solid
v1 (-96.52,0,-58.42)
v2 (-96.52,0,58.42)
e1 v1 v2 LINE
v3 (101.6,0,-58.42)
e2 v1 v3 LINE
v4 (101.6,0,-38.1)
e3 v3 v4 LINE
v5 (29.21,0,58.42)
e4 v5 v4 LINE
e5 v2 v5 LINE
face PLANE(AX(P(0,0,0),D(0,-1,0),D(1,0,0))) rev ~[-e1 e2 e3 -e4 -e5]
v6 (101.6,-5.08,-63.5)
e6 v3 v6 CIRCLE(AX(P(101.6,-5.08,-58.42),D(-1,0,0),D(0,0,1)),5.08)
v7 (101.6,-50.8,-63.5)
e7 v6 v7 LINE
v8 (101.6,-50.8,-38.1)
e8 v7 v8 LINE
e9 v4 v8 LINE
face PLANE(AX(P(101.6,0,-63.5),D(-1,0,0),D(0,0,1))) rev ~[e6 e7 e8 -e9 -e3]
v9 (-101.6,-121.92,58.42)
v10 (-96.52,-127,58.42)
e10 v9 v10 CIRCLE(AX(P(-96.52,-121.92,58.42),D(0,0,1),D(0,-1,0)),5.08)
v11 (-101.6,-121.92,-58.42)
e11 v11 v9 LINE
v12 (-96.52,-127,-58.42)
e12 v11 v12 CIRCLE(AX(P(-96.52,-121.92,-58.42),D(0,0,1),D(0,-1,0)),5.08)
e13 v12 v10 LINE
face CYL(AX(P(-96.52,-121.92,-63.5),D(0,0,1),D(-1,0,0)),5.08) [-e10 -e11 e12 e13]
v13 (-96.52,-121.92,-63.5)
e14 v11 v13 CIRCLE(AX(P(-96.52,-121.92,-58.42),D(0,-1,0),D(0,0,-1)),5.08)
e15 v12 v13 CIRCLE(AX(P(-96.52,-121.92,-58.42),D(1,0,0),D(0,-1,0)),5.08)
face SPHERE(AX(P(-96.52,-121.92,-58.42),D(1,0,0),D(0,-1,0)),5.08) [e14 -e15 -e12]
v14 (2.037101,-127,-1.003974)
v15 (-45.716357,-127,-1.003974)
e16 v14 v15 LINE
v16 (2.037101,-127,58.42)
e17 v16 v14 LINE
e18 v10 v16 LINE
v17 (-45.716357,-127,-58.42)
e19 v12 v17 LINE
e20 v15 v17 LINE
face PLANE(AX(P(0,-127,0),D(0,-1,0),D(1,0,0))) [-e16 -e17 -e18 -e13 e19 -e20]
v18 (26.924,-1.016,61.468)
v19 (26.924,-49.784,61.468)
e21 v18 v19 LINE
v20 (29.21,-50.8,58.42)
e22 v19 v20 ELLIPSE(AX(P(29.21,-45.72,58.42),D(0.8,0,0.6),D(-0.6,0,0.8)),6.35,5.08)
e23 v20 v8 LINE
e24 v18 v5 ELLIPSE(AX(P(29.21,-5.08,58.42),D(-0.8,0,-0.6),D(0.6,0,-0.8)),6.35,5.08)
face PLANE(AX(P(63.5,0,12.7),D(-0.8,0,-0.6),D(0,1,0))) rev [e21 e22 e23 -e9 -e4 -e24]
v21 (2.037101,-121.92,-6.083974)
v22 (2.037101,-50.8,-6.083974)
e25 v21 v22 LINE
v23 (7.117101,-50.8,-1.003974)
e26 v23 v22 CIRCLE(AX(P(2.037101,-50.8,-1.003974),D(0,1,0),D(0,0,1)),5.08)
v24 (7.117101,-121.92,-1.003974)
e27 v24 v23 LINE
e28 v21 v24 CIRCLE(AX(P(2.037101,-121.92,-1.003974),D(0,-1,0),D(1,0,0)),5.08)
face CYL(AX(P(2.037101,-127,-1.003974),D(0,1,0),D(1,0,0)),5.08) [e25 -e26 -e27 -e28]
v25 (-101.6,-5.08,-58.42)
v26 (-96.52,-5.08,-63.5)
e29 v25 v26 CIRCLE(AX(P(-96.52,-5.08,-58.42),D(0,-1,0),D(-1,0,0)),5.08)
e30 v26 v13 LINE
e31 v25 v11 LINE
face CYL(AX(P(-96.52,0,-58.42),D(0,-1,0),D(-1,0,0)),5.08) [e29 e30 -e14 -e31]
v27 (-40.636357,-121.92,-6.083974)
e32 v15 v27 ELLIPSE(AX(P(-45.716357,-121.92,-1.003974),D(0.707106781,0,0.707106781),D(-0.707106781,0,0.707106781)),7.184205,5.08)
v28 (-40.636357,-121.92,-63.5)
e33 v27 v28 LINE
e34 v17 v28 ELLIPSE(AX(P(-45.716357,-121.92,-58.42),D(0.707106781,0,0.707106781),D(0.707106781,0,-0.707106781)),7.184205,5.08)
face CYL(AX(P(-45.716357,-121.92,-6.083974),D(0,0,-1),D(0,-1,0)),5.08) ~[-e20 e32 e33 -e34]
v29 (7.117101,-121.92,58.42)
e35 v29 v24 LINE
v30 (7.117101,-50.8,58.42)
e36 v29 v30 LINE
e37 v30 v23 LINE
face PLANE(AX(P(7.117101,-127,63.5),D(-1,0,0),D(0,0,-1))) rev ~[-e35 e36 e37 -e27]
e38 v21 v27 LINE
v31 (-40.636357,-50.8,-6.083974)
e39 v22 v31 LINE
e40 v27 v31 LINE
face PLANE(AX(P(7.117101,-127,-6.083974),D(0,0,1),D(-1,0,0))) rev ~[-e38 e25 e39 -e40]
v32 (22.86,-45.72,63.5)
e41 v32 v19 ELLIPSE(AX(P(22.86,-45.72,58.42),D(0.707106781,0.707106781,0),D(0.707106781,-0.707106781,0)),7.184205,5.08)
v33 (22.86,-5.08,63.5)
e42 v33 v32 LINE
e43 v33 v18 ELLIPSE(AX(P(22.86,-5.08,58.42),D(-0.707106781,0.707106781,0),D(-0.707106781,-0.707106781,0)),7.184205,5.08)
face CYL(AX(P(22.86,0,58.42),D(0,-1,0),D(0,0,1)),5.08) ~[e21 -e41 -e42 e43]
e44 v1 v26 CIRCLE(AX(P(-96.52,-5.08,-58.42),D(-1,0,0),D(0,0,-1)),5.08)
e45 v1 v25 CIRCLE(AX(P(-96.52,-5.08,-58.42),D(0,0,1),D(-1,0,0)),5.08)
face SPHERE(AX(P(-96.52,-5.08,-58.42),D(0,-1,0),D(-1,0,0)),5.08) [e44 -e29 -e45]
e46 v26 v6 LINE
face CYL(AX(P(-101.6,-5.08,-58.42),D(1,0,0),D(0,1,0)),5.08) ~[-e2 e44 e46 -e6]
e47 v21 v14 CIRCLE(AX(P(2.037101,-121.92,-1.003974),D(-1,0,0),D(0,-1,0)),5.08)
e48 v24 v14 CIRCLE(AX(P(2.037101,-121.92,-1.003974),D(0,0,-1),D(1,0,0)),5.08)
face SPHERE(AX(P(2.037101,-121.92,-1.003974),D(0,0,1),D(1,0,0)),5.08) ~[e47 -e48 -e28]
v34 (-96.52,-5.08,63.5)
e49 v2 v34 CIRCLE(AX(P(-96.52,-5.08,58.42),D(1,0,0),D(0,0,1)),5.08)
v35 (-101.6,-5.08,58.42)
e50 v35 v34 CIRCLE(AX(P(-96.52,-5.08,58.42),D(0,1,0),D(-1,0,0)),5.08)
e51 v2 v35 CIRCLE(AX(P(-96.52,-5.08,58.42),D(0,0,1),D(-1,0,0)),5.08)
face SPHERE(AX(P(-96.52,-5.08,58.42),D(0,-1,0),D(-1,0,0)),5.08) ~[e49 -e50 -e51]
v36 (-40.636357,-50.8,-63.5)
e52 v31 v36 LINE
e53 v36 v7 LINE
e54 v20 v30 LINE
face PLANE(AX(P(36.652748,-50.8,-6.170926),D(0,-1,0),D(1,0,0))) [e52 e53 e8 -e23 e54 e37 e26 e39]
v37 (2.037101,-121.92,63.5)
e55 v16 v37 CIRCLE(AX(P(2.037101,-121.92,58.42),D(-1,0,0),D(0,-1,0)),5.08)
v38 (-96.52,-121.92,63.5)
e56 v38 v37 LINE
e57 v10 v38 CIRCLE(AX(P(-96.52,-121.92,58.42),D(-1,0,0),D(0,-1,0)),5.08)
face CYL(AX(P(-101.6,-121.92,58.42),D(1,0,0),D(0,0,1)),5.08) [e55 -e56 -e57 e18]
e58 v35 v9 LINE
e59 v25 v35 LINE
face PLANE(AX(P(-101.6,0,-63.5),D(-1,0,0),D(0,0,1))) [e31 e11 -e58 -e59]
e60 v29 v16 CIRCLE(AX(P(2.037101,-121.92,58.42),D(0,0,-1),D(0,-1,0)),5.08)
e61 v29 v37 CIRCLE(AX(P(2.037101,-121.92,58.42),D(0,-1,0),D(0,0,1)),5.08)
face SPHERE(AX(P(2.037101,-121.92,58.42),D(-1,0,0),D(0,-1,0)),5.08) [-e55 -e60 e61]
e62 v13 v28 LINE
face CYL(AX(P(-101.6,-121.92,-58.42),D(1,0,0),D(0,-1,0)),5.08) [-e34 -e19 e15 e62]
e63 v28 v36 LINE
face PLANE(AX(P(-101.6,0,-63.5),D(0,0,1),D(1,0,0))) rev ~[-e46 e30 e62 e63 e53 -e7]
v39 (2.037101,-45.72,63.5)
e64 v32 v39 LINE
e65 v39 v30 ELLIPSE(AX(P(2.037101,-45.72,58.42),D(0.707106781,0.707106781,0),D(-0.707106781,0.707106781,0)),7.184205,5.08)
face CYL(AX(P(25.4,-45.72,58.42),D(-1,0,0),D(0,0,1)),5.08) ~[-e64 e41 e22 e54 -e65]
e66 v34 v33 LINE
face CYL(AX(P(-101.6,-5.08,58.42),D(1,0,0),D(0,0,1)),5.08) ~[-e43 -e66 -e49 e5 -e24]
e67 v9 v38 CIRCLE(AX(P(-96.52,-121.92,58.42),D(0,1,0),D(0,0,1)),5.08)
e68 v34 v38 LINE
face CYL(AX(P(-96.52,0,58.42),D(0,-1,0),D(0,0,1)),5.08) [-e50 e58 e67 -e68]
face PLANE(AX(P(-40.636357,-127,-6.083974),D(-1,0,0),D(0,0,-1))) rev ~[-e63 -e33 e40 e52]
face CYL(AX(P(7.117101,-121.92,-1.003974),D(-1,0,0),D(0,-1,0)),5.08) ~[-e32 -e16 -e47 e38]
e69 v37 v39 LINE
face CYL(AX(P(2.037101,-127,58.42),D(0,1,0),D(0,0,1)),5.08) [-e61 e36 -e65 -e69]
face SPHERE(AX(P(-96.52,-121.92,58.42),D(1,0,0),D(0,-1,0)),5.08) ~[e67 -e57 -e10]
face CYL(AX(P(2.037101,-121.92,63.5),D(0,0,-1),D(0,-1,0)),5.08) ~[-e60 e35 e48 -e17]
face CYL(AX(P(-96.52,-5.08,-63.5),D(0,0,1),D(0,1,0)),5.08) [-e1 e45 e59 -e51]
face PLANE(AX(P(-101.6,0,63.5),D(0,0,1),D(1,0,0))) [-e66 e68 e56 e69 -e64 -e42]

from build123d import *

# Parameters (mm, degrees)
F0_W     = 203.2
F0_H     = 127
F1_DEPTH = 127
F3_DEPTH = 76.2
F4_SIZE2 = 101.6
F4_SIZE  = 76.2
F5_R     = 5.08


# Not quite as in the source:
# - the program builds the solid bodies; features that only make, move or delete a surface that nothing else refers to are left out


with BuildPart() as f1:
    # F0 (on Front) → F1 (new body)
    with BuildSketch(Plane.XZ):
        Rectangle(F0_W, F0_H)
    extrude(amount=F1_DEPTH)

    # F2 (on face) → F3 (cut)
    with BuildSketch(Plane.XZ.offset(127)):
        Polygon((-40.63635692, -6.0839741491), (-40.63635692, -63.5), (101.6, -63.5), (101.6, 63.5), (7.1171009913, 63.5), (7.1171009913, -6.0839741491), align=None)
    extrude(amount=-F3_DEPTH, mode=Mode.SUBTRACT)

    # F4
    f4_edges = [f1.edges().sort_by_distance(p)[0] for p in [
        (101.6, -25.4, 63.5),
    ]]
    f4_side = f1.faces().sort_by_distance((-21.033148, -53.671887, 63.5))[0]
    chamfer(f4_edges, length=F4_SIZE, length2=F4_SIZE2, reference=f4_side)

    # F5
    f5_edges = [f1.edges().sort_by_distance(p)[0] for p in [
        (-47.24145, -127, 63.5),
        (7.117101, -127, 28.708013),
        (7.117101, -88.9, -6.083974),
        (7.117101, -88.9, 63.5),
        (16.25855, -50.8, 63.5),
        (25.4, -25.4, 63.5),
        (-16.759628, -127, -6.083974),
        (-40.636357, -127, -34.791987),
        (-71.118178, -127, -63.5),
        (-101.6, -127, 0),
        (-101.6, -63.5, 63.5),
        (-101.6, -63.5, -63.5),
        (-101.6, 0, 0),
        (-38.1, 0, 63.5),
        (0, 0, -63.5),
    ]]
    fillet(f5_edges, radius=F5_R)


solid = f1.part
